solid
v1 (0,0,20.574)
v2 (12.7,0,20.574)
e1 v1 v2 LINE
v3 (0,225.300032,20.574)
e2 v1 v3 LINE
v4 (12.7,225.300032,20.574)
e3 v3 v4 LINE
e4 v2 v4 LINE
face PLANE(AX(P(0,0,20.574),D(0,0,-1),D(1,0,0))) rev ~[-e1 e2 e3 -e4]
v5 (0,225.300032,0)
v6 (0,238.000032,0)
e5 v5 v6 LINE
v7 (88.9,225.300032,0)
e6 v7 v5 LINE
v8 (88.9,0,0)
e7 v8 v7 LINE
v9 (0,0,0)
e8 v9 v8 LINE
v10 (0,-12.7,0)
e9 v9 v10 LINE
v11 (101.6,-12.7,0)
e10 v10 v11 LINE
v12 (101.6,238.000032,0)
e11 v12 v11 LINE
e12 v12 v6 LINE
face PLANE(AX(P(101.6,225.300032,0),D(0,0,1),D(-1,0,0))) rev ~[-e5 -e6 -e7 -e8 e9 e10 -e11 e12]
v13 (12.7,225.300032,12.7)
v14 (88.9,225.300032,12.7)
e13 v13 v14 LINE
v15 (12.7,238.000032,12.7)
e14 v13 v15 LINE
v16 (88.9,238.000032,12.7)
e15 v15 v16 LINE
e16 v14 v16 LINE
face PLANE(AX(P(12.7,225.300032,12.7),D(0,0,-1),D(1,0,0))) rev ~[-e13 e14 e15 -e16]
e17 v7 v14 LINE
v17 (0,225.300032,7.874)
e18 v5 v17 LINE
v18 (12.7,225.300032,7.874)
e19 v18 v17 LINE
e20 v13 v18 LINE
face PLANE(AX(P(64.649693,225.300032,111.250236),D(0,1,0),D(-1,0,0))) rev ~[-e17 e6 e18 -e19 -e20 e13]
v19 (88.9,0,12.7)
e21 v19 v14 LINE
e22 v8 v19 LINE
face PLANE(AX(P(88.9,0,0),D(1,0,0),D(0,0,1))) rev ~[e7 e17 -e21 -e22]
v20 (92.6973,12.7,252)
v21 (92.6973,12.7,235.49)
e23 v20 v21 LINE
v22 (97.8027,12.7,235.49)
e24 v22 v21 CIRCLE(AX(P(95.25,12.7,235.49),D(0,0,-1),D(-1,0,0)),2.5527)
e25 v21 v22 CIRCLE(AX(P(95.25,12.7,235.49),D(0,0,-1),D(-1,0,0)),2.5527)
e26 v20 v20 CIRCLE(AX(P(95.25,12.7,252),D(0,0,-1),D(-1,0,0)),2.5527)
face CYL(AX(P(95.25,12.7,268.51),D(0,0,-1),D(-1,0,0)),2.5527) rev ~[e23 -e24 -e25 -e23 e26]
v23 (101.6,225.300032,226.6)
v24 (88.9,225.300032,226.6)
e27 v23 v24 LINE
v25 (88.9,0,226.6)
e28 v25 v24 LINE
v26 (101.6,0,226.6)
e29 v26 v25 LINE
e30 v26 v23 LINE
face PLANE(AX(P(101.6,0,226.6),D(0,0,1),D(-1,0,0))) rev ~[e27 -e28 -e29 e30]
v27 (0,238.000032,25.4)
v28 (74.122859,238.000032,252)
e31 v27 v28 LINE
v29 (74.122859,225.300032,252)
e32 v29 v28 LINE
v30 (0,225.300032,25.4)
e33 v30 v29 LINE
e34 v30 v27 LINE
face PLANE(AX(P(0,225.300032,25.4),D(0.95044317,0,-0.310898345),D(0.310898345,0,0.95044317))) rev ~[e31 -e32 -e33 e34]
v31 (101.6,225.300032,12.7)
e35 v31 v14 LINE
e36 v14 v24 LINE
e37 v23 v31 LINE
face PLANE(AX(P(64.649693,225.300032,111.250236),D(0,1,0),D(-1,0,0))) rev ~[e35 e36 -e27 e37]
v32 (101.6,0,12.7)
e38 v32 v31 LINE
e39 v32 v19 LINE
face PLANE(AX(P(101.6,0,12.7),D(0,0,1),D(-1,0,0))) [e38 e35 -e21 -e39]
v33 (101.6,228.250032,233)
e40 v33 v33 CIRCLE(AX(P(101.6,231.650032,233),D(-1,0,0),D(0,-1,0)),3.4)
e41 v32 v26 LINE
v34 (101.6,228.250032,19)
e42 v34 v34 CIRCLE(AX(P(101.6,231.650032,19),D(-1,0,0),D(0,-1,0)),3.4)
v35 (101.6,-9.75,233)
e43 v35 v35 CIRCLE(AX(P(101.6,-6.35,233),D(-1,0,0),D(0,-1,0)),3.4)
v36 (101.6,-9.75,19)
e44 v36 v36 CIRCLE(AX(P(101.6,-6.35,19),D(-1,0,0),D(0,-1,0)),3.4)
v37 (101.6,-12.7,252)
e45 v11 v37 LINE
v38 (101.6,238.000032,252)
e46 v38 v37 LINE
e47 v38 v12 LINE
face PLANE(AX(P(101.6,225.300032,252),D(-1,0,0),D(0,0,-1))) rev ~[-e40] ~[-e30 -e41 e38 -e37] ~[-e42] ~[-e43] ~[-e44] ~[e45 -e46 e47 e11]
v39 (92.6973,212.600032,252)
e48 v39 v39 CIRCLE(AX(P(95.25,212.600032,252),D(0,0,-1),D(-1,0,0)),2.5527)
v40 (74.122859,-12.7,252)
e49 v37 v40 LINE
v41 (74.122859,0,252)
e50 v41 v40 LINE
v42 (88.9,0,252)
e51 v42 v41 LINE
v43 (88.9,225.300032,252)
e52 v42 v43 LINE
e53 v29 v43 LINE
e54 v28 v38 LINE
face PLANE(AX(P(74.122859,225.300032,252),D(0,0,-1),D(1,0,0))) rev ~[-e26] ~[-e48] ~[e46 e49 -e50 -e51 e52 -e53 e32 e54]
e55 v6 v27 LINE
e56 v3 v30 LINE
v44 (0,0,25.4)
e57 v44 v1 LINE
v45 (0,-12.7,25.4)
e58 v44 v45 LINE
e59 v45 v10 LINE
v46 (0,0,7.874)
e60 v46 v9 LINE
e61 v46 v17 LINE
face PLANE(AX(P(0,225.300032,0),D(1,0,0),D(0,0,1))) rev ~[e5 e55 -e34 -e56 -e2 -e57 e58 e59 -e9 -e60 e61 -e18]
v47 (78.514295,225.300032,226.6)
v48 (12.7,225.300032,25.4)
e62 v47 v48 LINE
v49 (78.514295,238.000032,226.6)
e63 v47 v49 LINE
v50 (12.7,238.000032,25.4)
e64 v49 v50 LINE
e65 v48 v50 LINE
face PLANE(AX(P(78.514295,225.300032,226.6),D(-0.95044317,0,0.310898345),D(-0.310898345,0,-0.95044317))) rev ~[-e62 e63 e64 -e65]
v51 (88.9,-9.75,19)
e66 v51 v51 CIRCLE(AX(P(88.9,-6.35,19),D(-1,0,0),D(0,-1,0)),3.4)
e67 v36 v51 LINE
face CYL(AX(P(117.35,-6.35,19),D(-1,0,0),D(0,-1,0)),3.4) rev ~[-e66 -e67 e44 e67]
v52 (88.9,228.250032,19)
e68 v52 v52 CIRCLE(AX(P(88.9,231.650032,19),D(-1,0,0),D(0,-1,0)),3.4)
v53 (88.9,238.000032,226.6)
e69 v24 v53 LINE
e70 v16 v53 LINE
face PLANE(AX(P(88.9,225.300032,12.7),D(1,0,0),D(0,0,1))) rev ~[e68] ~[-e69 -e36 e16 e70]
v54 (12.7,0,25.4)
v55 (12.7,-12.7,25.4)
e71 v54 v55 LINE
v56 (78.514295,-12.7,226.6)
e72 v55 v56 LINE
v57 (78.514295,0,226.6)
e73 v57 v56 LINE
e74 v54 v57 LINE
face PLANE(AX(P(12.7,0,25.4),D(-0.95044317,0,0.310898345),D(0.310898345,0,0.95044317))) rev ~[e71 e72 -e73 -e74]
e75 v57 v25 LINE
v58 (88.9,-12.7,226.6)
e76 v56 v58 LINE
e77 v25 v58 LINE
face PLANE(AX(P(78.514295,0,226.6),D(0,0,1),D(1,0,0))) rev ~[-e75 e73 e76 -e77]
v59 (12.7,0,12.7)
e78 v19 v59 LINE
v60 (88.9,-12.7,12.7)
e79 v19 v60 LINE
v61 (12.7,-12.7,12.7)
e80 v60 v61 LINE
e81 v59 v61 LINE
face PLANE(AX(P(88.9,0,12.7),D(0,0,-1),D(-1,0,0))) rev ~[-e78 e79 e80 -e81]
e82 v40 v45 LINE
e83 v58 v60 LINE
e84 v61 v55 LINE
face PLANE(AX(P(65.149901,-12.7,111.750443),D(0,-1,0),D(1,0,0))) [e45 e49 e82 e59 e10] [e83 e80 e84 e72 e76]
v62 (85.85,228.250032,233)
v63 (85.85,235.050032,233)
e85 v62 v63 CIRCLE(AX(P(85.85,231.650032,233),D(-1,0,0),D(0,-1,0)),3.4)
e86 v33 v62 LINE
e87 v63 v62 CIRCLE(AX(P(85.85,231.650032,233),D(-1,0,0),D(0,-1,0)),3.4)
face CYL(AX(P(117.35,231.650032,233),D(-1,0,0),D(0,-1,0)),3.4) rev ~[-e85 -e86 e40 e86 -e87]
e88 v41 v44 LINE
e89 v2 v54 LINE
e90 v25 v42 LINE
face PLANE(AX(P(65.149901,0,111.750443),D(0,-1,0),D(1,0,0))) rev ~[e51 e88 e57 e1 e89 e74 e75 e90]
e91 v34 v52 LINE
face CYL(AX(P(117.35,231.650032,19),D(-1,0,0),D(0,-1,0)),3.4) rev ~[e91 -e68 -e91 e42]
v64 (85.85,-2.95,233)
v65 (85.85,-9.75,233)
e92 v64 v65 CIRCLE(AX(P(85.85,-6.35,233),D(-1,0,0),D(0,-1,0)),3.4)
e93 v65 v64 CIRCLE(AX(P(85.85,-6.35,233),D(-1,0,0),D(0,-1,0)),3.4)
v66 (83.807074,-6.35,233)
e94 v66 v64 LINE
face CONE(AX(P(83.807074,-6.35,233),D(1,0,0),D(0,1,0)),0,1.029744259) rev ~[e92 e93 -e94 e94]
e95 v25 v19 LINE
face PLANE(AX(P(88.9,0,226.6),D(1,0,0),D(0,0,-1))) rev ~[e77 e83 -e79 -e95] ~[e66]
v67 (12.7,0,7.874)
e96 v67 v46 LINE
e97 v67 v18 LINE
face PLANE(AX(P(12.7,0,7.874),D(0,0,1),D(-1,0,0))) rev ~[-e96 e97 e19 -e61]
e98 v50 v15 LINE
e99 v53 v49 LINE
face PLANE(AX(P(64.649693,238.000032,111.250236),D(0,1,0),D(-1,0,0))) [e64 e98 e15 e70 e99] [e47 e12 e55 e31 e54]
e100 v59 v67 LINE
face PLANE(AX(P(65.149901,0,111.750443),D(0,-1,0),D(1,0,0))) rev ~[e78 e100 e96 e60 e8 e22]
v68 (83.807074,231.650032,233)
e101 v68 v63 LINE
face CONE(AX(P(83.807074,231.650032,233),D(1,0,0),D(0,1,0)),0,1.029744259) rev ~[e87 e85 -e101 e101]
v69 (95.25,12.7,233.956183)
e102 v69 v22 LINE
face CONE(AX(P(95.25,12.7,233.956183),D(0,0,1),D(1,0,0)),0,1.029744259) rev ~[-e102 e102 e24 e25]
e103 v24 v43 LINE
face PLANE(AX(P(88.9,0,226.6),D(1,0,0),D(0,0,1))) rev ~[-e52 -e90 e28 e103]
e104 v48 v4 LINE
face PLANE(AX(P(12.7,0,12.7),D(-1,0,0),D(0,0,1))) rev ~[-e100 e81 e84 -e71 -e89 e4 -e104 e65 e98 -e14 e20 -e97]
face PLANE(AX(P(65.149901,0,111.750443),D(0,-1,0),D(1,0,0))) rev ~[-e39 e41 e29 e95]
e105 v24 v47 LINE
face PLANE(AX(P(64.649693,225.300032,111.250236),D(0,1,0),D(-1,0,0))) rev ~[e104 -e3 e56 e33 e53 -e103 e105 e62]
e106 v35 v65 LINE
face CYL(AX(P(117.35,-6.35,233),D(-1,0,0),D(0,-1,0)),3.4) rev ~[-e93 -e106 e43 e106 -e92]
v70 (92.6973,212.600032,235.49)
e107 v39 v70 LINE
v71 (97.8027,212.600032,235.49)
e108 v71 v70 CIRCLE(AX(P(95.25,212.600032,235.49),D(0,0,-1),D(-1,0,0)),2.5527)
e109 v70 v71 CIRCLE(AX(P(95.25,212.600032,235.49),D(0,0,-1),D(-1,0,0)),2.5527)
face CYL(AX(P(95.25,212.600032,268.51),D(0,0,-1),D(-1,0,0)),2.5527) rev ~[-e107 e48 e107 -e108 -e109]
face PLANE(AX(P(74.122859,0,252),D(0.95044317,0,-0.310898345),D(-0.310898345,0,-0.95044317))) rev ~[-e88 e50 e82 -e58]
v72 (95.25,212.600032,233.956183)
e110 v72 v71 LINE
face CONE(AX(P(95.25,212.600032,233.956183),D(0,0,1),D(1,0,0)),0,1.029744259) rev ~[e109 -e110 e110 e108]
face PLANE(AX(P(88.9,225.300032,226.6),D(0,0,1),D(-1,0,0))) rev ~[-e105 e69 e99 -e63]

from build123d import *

# Parameters (mm, degrees)
F1_DEPTH = 12.7
F2_W     = 12.7
F2_H     = 12.7
F3_DEPTH = 225.300032
F4_W     = 12.7
F4_H     = 25.4
F5_DEPTH = 12.7
F7_D     = 6.8
F7_DEPTH = 15.75
F7_TIP   = 2.0429261047
F9_D     = 5.1054
F9_DEPTH = 16.51
F9_TIP   = 1.5338169022


# Not quite as in the source:
# - a feature names something its author has since deleted; it is built from what else it names


with BuildPart() as f1:
    # F0 (on Front) → F1 (new body)
    with BuildSketch(Plane.XZ):
        Polygon((0, 25.4), (0, 0), (101.6, 0), (101.6, 226.6), (101.6, 239.3), (101.6, 252), (74.1228589826, 252), align=None)
        Polygon((78.5142949131, 226.6), (88.9, 226.6), (88.9, 12.7), (12.7, 12.7), (12.7, 25.4), align=None, mode=Mode.SUBTRACT)
    extrude(amount=F1_DEPTH)

    # F2 (on face) → F3 (join)
    with BuildSketch(Plane(origin=(0, 0, 0), x_dir=(-1, 0, 0), z_dir=(0, 1, 0))):
        with Locations((-95.25, 6.35)):
            Rectangle(F2_W, F2_H)
        Polygon((-101.6, 252), (-101.6, 226.6), (-88.9, 226.6), (-88.9, 229.1588783264), (-88.9, 252), align=None)
        Polygon((-12.7, 20.574), (-12.7, 12.7), (-12.7, 7.874), (0, 7.874), (0, 20.574), align=None)
    extrude(amount=F3_DEPTH)

    # F4 (on face) → F5 (join)
    with BuildSketch(Plane(origin=(0, 225.300032, 0), x_dir=(-1, 0, 0), z_dir=(0, 1, 0))):
        Polygon((0, 0), (0, 25.4), (-74.1228589826, 252), (-88.9, 252), (-88.9, 226.6), (-101.6, 226.6), (-101.6, 0), align=None)
        Polygon((-88.9, 25.4), (-88.9, 226.6), (-78.5142949131, 226.6), (-12.7, 25.4), (-12.7, 12.7), (-88.9, 12.7), align=None, mode=Mode.SUBTRACT)
        with Locations((-95.25, 239.3)):
            Rectangle(F4_W, F4_H)
    extrude(amount=F5_DEPTH)

    # F7
    with Locations(Plane.YZ.offset(101.6)):
        with Locations((-6.35, 19), (-6.35, 233), (231.650032, 233), (231.650032, 19)):
            Hole(F7_D / 2, depth=F7_DEPTH)
            with Locations((0, 0, -(F7_DEPTH + F7_TIP / 2))):  # 118° drill point
                Cone(0, F7_D / 2, F7_TIP, mode=Mode.SUBTRACT)

    # F9
    with Locations(Plane.XY.offset(252)):
        with Locations((95.25, 212.600032), (95.25, 12.7)):
            Hole(F9_D / 2, depth=F9_DEPTH)
            with Locations((0, 0, -(F9_DEPTH + F9_TIP / 2))):  # 118° drill point
                Cone(0, F9_D / 2, F9_TIP, mode=Mode.SUBTRACT)


solid = f1.part
